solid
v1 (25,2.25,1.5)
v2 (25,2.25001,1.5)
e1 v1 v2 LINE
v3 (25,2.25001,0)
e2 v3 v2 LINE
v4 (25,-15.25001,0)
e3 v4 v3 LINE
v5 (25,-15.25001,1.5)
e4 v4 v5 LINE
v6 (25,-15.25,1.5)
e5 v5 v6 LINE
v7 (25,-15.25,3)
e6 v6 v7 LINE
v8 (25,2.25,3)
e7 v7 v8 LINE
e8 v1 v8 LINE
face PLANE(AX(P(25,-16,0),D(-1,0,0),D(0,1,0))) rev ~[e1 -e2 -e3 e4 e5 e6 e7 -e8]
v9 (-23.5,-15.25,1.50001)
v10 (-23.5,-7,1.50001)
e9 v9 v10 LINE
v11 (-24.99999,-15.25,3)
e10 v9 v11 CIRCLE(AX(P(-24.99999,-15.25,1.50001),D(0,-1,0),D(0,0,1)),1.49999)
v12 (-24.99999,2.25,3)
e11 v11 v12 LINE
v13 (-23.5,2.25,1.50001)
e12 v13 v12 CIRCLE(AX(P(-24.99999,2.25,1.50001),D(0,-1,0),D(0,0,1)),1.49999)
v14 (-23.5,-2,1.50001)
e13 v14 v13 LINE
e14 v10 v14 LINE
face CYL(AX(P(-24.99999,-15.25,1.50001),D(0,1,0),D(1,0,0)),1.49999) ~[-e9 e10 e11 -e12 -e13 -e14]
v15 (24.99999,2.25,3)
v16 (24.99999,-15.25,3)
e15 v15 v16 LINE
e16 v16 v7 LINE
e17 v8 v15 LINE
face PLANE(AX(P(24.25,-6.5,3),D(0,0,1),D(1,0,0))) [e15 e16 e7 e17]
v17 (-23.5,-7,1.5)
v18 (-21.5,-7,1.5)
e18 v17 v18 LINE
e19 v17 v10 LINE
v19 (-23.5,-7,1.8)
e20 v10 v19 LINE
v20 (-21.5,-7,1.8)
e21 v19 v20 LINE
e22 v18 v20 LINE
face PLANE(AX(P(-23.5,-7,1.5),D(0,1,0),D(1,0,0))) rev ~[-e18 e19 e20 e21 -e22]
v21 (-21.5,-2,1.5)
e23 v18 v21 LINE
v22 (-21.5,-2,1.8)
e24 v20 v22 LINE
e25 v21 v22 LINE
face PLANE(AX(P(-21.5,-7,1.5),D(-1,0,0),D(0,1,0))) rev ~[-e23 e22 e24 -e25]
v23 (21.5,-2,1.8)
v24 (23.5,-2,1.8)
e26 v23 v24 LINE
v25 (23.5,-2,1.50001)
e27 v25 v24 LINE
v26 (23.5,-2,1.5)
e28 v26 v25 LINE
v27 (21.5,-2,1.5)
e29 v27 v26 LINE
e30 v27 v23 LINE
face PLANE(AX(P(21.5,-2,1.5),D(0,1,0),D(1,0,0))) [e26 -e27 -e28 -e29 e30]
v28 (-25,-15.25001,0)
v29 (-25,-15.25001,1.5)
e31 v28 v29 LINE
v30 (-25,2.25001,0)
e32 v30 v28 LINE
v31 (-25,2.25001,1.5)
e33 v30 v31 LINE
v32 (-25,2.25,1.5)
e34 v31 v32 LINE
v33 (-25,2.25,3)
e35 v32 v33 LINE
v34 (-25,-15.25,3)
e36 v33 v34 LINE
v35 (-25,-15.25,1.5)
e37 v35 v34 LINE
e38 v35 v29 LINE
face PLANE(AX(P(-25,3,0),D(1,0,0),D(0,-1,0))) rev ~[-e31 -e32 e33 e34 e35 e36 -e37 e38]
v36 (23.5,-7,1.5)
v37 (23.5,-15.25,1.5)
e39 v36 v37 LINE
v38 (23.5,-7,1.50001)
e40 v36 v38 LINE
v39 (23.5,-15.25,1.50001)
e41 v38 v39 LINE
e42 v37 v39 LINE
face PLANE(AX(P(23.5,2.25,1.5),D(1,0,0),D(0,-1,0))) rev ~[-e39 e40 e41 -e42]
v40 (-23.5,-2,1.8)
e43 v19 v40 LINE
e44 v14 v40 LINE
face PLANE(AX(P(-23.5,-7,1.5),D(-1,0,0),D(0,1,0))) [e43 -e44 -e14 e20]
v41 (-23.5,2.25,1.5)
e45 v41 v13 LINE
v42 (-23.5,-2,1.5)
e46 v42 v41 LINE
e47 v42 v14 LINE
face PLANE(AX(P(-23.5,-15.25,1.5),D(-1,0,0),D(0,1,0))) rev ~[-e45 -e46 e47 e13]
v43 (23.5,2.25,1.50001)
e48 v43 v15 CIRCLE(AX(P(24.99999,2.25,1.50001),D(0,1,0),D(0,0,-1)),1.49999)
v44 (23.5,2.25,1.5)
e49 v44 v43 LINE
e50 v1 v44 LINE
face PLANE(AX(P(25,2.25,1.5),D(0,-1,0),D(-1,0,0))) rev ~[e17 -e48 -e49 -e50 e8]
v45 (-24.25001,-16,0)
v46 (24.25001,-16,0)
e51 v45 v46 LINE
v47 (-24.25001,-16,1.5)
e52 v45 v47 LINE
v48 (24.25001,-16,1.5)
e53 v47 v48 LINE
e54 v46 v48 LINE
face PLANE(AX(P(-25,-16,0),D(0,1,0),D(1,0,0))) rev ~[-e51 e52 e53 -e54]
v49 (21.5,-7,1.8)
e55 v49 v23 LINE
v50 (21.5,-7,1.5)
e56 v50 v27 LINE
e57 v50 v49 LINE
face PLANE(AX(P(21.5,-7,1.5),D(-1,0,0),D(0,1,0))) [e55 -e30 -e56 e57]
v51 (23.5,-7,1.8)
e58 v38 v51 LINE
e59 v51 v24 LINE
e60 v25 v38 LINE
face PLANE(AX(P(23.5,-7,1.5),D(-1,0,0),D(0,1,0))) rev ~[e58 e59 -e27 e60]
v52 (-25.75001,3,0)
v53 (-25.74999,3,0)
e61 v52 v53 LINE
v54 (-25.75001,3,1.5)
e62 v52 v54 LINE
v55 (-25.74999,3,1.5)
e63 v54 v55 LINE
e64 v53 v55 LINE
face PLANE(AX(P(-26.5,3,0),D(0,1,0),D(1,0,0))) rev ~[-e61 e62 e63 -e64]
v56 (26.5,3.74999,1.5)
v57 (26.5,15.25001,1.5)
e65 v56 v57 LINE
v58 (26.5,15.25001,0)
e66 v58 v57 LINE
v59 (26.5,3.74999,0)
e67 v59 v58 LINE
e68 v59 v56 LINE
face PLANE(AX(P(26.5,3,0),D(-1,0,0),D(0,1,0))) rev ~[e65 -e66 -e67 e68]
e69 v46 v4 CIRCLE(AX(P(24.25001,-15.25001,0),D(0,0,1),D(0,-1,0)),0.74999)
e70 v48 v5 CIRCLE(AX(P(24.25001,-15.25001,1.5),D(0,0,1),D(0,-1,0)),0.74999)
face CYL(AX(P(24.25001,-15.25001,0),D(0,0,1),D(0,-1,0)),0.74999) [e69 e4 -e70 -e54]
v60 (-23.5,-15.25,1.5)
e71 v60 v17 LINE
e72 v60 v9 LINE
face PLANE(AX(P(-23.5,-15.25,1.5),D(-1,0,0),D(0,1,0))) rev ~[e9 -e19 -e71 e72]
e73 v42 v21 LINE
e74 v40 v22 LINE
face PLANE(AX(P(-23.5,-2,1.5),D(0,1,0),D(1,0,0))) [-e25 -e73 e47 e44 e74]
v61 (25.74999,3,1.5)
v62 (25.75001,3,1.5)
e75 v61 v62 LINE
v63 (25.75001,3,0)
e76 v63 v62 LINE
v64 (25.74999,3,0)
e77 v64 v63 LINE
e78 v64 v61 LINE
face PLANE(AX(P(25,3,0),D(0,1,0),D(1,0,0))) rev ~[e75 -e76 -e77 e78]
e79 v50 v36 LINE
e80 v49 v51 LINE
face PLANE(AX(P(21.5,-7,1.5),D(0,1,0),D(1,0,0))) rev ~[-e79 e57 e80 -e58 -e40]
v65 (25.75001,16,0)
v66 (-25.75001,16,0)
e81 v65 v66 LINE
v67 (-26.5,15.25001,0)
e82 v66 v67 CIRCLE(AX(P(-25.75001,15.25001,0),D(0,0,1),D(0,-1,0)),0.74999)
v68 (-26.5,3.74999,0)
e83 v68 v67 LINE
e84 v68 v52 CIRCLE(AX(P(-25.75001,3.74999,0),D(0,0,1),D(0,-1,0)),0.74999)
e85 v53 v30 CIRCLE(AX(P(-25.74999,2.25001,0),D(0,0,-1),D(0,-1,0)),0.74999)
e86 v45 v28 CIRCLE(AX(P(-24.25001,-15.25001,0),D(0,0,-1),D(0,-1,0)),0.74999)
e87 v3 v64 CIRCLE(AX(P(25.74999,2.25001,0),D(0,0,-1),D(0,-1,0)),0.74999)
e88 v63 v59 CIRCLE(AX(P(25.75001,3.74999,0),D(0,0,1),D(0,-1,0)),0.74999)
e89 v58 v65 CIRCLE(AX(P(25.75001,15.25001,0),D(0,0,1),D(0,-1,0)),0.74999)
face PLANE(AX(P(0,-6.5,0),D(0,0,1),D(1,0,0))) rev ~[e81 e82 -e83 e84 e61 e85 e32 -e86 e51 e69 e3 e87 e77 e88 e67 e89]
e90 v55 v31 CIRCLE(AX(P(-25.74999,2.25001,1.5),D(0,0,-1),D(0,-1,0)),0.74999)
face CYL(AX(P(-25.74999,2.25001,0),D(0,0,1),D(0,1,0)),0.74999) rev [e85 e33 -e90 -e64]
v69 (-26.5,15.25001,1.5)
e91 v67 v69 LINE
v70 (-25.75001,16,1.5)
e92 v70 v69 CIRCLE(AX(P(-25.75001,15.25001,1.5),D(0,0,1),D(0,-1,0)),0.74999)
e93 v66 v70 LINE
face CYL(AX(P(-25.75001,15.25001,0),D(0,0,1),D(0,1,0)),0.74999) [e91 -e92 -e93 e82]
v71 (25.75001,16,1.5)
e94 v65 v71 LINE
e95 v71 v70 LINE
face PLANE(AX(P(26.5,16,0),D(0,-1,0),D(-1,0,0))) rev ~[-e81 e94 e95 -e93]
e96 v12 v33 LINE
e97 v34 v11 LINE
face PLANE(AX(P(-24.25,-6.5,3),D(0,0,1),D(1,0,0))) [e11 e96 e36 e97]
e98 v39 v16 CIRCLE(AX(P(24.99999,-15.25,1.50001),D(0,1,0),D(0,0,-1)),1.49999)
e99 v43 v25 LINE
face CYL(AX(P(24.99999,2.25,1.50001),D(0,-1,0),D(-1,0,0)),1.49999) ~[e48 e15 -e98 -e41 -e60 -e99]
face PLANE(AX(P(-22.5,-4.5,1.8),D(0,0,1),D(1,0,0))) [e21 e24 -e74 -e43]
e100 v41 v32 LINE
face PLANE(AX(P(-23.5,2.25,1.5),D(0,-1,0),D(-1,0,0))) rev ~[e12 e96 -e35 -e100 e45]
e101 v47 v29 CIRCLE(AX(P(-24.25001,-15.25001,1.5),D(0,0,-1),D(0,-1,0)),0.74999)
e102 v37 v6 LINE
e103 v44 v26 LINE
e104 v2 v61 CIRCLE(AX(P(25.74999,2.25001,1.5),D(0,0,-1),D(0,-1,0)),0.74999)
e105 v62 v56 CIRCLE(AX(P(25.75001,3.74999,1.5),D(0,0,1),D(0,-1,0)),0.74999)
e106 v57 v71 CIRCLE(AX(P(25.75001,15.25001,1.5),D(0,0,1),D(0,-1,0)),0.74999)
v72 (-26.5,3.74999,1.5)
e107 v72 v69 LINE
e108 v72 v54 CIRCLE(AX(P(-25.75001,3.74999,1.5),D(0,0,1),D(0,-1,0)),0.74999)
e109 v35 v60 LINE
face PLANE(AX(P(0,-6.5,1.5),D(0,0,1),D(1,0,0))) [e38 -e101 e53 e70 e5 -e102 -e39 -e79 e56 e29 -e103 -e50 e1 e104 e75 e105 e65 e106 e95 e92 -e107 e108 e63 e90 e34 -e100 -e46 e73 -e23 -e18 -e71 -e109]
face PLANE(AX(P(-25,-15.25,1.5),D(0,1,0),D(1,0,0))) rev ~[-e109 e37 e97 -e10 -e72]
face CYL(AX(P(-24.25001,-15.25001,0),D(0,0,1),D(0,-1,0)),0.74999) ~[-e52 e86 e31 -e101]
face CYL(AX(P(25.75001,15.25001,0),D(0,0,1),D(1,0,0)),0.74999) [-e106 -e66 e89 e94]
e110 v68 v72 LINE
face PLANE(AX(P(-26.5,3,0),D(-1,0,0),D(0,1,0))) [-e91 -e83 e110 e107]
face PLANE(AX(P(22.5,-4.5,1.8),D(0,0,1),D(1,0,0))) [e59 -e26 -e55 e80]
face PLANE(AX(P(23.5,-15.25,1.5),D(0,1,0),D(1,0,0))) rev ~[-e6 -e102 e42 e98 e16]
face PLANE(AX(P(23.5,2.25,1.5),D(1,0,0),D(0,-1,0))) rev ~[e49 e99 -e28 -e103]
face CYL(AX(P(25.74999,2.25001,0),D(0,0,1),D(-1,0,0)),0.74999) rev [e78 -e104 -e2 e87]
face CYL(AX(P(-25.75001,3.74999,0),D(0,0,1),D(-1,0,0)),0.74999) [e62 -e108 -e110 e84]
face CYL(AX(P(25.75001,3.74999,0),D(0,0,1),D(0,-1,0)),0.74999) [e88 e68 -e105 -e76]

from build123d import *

# Parameters (mm, degrees)
F0_W     = 50
F0_H     = 19
F0_H_2   = 13
F0_W_2   = 1.5
F1_DEPTH = 1.5
F2_R     = 0.74999
F4_DEPTH = 1.5
F5_R     = 1.49999
F3_W     = 2
F3_H     = 5
F6_DEPTH = 0.3


# Not quite as in the source:
# - a fillet or chamfer is up to 0.001 mm smaller than in the source, because OpenCascade refuses the exact size


with BuildPart() as f1:
    # F0 (on Top) → F1 (new body)
    with BuildSketch(Plane.XY):
        with Locations((0, -6.5)):
            Rectangle(F0_W, F0_H)
        with Locations((0, 9.5)):
            Rectangle(F0_W, F0_H_2)
        with Locations((-25.75, 9.5)):
            Rectangle(F0_W_2, F0_H_2)
        with Locations((25.75, 9.5)):
            Rectangle(F0_W_2, F0_H_2)
    extrude(amount=F1_DEPTH)

    # F2 (radius 0.75 in the source; OpenCascade refuses exactly that, so slightly less here)
    f2_edges = [f1.edges().sort_by_distance(p)[0] for p in [
        (-26.5, 16, 0.75),
        (-26.5, 3, 0.75),
        (-25, 3, 0.75),
        (-25, -16, 0.75),
        (25, -16, 0.75),
        (25, 3, 0.75),
        (26.5, 3, 0.75),
        (26.5, 16, 0.75),
    ]]
    fillet(f2_edges, radius=F2_R)

    # F3 (on face) → F4 (join)
    with BuildSketch(Plane.XY.offset(1.5)):
        Polygon((-23.5, 2.25), (-25, 2.25), (-25, -15.25), (-23.5, -15.25), (-23.5, -7), (-23.5, -2), align=None)
        Polygon((23.5, -15.25), (25, -15.25), (25, 2.25), (23.5, 2.25), (23.5, -2), (23.5, -7), align=None)
    extrude(amount=F4_DEPTH)

    # F5 (radius 1.5 in the source; OpenCascade refuses exactly that, so slightly less here)
    f5_edges = [f1.edges().sort_by_distance(p)[0] for p in [
        (-23.5, -6.5, 3),
        (23.5, -6.5, 3),
    ]]
    fillet(f5_edges, radius=F5_R)

    # F3 (on face) → F6 (join)
    with BuildSketch(Plane.XY.offset(1.5)):
        with Locations((-22.5, -4.5)):
            Rectangle(F3_W, F3_H)
        with Locations((22.5, -4.5)):
            Rectangle(F3_W, F3_H)
    extrude(amount=F6_DEPTH)


solid = f1.part
